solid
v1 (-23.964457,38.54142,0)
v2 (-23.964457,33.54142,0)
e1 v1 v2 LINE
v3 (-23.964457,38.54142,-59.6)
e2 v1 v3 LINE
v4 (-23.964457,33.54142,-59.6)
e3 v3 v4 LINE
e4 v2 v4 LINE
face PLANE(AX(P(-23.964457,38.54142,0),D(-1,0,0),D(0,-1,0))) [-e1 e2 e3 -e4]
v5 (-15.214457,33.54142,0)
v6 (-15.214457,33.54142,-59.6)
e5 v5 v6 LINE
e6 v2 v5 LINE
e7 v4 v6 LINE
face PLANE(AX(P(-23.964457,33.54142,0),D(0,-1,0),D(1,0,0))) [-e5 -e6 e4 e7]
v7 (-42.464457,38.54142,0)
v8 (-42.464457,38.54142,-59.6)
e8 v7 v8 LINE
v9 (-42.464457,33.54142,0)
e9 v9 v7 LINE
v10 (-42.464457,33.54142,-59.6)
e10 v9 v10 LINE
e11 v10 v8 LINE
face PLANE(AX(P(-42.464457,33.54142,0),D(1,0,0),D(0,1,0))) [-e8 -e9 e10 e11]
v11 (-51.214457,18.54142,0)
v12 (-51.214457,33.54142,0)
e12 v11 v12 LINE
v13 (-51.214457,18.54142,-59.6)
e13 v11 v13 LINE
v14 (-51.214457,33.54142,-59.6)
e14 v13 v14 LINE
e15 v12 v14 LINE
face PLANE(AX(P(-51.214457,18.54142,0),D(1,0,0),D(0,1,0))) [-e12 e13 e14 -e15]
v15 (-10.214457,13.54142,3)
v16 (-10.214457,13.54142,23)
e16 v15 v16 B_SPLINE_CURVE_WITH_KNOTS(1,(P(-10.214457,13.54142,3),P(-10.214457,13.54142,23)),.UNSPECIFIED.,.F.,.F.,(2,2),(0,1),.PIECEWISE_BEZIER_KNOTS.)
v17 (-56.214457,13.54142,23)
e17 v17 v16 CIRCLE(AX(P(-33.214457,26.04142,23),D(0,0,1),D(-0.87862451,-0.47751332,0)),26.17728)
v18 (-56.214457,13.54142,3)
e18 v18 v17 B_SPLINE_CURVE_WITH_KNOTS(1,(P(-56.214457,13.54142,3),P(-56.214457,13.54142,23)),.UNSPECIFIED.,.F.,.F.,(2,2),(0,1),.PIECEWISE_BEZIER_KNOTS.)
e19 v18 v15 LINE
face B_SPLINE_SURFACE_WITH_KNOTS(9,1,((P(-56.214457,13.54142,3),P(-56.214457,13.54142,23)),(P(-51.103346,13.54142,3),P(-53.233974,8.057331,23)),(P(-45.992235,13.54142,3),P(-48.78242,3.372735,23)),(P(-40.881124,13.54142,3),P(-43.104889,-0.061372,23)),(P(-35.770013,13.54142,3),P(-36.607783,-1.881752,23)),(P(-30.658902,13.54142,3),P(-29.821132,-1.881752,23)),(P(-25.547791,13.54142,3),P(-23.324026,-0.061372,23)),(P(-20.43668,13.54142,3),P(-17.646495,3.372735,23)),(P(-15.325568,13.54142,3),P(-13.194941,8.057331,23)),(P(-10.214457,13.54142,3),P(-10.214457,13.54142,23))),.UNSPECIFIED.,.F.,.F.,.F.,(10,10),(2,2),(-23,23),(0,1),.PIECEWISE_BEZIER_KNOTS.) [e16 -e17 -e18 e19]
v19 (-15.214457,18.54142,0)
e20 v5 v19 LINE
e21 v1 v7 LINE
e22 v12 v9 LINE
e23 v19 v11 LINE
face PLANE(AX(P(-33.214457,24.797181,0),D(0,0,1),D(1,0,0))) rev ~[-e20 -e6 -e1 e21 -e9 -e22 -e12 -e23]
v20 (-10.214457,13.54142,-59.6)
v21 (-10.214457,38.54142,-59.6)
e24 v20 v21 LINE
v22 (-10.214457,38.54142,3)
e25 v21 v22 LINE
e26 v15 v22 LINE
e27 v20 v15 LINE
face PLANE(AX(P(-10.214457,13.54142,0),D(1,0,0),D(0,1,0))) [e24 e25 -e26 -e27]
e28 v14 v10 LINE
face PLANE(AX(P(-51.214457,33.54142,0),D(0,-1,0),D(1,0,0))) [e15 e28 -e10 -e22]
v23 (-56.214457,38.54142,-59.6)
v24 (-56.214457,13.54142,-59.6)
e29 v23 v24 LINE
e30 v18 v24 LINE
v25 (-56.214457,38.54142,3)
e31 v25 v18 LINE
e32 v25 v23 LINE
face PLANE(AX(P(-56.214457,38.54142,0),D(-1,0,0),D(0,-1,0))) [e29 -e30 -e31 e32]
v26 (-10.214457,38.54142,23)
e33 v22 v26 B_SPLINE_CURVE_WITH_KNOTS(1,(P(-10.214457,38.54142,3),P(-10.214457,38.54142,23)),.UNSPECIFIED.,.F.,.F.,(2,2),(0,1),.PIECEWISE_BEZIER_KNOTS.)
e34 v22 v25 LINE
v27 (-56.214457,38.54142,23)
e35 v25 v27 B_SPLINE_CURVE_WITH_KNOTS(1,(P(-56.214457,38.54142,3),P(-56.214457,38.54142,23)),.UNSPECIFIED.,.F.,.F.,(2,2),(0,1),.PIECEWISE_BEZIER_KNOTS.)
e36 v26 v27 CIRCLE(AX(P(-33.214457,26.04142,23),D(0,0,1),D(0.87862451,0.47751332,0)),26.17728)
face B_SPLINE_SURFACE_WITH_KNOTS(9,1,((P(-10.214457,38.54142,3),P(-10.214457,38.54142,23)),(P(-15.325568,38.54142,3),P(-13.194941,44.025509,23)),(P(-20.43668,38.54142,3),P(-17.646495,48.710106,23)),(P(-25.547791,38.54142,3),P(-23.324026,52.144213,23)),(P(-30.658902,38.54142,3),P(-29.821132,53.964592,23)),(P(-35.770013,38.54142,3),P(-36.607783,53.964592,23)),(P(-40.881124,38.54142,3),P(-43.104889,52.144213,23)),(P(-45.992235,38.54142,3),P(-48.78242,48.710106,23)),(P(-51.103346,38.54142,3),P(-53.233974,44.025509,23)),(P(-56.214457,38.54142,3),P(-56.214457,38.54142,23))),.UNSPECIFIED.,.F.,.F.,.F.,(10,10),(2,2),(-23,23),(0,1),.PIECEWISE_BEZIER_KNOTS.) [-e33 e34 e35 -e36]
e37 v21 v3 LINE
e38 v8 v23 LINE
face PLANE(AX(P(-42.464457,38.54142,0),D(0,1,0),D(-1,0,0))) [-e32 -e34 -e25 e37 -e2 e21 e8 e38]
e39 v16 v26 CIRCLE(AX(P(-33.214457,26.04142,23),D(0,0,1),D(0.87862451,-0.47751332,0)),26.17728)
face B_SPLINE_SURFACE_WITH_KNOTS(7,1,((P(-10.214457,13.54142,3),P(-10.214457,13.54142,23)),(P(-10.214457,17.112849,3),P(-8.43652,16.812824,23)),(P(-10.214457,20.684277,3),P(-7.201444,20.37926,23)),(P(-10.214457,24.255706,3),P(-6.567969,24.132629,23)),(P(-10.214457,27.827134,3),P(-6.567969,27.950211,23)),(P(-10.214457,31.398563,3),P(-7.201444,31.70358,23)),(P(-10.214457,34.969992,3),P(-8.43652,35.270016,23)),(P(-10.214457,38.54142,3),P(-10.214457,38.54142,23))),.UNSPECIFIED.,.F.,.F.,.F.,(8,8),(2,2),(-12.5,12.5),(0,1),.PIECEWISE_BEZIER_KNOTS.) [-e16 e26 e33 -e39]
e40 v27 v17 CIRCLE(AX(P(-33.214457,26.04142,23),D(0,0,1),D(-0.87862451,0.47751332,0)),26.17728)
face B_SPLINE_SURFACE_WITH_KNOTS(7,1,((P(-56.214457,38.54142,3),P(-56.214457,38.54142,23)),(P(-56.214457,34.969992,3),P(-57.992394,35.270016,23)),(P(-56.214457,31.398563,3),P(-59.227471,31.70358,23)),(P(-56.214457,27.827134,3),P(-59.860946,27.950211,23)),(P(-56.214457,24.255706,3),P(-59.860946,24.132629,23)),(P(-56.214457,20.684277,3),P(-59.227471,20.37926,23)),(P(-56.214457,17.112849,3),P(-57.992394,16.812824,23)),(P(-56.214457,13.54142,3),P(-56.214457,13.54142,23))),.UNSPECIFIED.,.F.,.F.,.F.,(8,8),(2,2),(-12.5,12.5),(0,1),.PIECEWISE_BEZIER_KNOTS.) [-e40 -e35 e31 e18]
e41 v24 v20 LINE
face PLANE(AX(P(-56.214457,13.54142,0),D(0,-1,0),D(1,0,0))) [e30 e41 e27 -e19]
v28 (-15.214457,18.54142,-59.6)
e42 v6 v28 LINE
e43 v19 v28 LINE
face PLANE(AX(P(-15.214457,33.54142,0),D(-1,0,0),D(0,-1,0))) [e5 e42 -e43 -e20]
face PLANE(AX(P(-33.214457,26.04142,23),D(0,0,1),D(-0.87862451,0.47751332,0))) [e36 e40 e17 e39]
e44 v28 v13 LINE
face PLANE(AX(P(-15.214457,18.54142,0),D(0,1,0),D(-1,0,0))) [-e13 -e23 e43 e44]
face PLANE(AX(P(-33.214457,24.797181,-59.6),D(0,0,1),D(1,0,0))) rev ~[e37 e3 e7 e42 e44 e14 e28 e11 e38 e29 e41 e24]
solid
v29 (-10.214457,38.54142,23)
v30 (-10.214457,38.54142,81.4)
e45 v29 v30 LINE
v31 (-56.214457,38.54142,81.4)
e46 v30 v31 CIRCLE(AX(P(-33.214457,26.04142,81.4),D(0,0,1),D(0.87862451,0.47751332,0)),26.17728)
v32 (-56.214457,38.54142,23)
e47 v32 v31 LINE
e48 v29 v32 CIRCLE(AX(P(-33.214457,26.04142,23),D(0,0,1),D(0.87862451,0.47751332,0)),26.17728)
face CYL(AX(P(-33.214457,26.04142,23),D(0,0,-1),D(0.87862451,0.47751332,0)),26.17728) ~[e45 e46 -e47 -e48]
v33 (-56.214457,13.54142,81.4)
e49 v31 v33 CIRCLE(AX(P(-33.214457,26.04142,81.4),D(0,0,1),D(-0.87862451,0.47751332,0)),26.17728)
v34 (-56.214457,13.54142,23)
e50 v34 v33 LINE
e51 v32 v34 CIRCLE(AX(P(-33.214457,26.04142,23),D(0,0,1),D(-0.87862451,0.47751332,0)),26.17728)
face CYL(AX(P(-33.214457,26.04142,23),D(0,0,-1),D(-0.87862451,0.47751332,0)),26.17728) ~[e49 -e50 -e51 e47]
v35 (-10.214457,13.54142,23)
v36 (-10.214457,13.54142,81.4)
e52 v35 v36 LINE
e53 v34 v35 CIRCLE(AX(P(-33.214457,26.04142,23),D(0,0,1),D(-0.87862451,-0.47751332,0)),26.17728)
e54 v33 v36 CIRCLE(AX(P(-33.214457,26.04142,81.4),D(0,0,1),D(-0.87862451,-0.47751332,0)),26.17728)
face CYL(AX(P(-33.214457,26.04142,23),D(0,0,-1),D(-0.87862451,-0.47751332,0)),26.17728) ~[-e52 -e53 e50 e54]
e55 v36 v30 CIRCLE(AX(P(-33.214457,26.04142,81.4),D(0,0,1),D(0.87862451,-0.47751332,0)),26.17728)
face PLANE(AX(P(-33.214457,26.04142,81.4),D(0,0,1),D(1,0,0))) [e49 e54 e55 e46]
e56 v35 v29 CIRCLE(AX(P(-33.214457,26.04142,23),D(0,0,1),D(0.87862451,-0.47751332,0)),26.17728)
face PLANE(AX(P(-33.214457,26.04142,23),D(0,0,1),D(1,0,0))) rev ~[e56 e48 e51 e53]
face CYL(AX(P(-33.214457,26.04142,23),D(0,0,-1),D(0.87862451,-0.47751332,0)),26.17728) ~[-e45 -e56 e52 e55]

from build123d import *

# Parameters (mm, degrees)
F0_W      = 18.5
F0_H      = 5
F1_DEPTH  = 3
F4_DEPTH  = 58.4
F1_FACE_W = 46
F1_FACE_H = 25
F6_DEPTH  = 59.6


with BuildPart() as f1:
    # F0 (on Top) → F1 (new body)
    with BuildSketch(Plane.XY):
        Polygon((-56.2144573331, 13.5414201766), (-10.2144573331, 13.5414201766), (-10.2144573331, 38.5414201766), (-23.9644573331, 38.5414201766), (-23.9644573331, 33.5414201766), (-15.2144573331, 33.5414201766), (-15.2144573331, 18.5414201766), (-51.2144573331, 18.5414201766), (-51.2144573331, 33.5414201766), (-42.4644573331, 33.5414201766), (-42.4644573331, 38.5414201766), (-56.2144573331, 38.5414201766), align=None)
        with Locations((-33.2144573331, 36.0414201766)):
            Rectangle(F0_W, F0_H)
        Polygon((-15.2144573331, 33.5414201766), (-23.9644573331, 33.5414201766), (-42.4644573331, 33.5414201766), (-51.2144573331, 33.5414201766), (-51.2144573331, 18.5414201766), (-15.2144573331, 18.5414201766), align=None)
    extrude(amount=F1_DEPTH)

    # F1_face (on face) → F5 section 0
    with BuildSketch(Plane(origin=(-33.2144573331, 26.0414201766, 3), x_dir=(1, 0, 0), z_dir=(0, 0, 1))):
        Rectangle(F1_FACE_W, F1_FACE_H)
    # F3 (on offset) → F5 section 1
    with BuildSketch(Plane.XY.offset(23)):
        with BuildLine():
            ThreePointArc((-10.2144573331, 38.5414201766), (-33.2144573331, 52.218700402), (-56.2144573331, 38.5414201766))
            ThreePointArc((-56.2144573331, 38.5414201766), (-59.3917375585, 26.0414201766), (-56.2144573331, 13.5414201766))
            ThreePointArc((-56.2144573331, 13.5414201766), (-33.2144573331, -0.1358600488), (-10.2144573331, 13.5414201766))
            ThreePointArc((-10.2144573331, 13.5414201766), (-7.0371771077, 26.0414201766), (-10.2144573331, 38.5414201766))
        make_face()
    loft()

    # F0 (on Top) → F6 (join)
    with BuildSketch(Plane.XY):
        Polygon((-56.2144573331, 13.5414201766), (-10.2144573331, 13.5414201766), (-10.2144573331, 38.5414201766), (-23.9644573331, 38.5414201766), (-23.9644573331, 33.5414201766), (-15.2144573331, 33.5414201766), (-15.2144573331, 18.5414201766), (-51.2144573331, 18.5414201766), (-51.2144573331, 33.5414201766), (-42.4644573331, 33.5414201766), (-42.4644573331, 38.5414201766), (-56.2144573331, 38.5414201766), align=None)
    extrude(amount=-F6_DEPTH)


with BuildPart() as f4:
    # F3 (on offset) → F4 (new body)
    with BuildSketch(Plane.XY.offset(23)):
        with BuildLine():
            ThreePointArc((-10.2144573331, 38.5414201766), (-33.2144573331, 52.218700402), (-56.2144573331, 38.5414201766))
            ThreePointArc((-56.2144573331, 38.5414201766), (-59.3917375585, 26.0414201766), (-56.2144573331, 13.5414201766))
            ThreePointArc((-56.2144573331, 13.5414201766), (-33.2144573331, -0.1358600488), (-10.2144573331, 13.5414201766))
            ThreePointArc((-10.2144573331, 13.5414201766), (-7.0371771077, 26.0414201766), (-10.2144573331, 38.5414201766))
        make_face()
    extrude(amount=F4_DEPTH)


solid = Compound([f1.part, f4.part])
